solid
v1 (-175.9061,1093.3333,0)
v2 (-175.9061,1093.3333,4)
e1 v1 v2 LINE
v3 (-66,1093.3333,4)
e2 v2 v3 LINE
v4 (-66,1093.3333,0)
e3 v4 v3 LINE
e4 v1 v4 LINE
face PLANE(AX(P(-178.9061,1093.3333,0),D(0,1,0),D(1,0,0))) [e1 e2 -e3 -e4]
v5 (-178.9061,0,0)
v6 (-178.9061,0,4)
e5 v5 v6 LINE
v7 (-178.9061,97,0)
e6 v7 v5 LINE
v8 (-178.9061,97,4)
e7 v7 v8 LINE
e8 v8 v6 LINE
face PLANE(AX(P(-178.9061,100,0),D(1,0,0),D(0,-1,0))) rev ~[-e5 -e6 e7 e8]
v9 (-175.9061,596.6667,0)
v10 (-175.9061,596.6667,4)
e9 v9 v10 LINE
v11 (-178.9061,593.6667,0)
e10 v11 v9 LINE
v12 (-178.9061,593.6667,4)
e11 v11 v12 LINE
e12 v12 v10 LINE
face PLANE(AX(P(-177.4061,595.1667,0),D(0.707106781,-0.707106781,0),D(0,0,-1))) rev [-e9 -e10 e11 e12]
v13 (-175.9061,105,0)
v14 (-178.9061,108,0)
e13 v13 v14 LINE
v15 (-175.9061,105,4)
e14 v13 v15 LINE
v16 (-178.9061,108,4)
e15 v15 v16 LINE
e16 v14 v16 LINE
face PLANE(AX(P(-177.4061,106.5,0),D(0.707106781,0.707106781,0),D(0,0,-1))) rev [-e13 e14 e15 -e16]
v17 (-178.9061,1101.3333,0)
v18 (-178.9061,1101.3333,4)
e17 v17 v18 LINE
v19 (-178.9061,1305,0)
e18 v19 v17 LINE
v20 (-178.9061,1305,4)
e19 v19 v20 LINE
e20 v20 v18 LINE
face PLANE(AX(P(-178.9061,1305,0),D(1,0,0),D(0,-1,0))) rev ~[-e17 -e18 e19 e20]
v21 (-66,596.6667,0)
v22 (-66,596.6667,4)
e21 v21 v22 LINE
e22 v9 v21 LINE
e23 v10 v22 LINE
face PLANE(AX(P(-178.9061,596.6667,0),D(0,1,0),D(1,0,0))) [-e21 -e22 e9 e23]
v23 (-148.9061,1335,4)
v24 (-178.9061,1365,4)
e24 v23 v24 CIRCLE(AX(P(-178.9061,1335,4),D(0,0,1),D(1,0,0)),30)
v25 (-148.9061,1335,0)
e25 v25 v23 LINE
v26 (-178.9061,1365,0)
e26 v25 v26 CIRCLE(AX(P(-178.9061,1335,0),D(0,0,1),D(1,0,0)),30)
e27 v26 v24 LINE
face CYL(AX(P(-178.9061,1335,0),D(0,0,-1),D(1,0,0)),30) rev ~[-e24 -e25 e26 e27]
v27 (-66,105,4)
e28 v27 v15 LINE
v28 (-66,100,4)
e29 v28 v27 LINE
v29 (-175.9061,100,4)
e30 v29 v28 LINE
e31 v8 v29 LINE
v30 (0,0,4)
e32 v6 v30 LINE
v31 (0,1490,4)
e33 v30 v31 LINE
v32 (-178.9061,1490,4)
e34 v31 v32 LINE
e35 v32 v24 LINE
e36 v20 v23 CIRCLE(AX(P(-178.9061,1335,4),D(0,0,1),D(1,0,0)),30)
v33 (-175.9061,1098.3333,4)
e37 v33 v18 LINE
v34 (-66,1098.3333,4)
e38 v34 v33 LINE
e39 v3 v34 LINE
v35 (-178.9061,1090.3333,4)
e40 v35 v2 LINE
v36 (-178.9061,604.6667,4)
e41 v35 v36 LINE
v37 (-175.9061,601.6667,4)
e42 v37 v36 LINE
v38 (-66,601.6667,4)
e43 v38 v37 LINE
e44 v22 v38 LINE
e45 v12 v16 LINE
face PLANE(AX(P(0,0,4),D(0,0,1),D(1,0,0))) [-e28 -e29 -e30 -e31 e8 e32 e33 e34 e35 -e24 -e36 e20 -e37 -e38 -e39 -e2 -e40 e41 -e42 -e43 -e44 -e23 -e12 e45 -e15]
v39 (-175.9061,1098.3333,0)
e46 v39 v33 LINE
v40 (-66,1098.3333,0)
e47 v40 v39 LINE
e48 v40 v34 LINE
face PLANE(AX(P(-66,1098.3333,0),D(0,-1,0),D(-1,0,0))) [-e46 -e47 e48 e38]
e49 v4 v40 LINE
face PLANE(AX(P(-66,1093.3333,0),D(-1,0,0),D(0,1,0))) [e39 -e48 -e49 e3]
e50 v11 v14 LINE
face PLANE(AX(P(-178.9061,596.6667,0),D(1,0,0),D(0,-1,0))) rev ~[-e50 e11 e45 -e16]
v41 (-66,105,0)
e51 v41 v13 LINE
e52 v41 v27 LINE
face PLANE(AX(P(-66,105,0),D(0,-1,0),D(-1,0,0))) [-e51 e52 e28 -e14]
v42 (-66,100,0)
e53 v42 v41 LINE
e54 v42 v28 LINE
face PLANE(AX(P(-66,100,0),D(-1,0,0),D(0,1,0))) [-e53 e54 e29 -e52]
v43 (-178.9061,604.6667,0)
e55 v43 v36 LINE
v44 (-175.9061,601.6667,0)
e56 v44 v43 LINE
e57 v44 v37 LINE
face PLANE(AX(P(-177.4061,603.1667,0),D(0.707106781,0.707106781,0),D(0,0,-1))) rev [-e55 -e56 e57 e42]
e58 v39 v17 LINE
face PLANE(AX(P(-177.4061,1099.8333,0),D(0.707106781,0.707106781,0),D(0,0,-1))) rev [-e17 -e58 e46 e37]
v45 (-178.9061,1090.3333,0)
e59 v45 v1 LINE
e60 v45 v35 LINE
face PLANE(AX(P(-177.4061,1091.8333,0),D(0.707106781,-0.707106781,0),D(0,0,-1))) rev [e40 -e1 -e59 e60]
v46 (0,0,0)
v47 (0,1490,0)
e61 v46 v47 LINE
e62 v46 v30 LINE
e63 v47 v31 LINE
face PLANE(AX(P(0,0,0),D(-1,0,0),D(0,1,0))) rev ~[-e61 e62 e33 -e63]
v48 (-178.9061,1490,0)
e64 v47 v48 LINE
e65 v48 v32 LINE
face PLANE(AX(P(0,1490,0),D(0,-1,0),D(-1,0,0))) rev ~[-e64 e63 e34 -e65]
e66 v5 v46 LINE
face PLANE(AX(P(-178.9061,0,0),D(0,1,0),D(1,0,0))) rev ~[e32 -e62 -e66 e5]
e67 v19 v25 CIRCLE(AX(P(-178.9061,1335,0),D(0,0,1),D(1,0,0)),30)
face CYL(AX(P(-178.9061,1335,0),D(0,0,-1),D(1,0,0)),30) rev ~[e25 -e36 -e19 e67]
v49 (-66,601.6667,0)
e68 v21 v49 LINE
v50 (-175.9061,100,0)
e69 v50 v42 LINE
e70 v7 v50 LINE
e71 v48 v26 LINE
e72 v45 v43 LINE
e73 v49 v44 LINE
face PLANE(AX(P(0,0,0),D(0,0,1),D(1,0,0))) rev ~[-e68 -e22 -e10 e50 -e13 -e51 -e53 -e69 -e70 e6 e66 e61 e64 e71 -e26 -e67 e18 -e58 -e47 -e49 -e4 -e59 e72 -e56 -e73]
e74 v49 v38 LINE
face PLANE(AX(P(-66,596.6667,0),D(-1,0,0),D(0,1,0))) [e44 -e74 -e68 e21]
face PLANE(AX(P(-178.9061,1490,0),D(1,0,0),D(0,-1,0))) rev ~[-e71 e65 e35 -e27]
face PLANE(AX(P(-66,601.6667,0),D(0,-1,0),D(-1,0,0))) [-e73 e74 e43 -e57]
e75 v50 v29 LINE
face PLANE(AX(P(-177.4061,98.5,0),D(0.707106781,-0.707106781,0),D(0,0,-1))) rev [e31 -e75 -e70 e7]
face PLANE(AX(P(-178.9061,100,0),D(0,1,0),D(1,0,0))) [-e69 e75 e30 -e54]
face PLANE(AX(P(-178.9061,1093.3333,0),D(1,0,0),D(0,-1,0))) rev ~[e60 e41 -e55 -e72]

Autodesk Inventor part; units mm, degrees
ref_plane "YZ Plane" through (0, 0, 0) normal (1, 0, 0) x (0, 1, 0)
ref_plane "XZ Plane" through (0, 0, 0) normal (0, 1, 0) x (-1, 0, 0)
ref_plane "XY Plane" through (0, 0, 0) normal (0, 0, 1) x (1, 0, 0)
sketch "Sketch1" plane through (0, 0, 0) normal (0, 0, 1) x (1, 0, 0)
  line L0 (0, 1490) -> (-178.9061, 1490)
  line L1 (-178.9061, 1490) -> (-178.9061, 0)
  line L2 (-178.9061, 0) -> (0, 0)
  line L3 (0, 0) -> (0, 1490)
  line L4 (-178.9061, 100) -> (-66, 100)
  line L5 (-66, 100) -> (-66, 105)
  line L6 (-66, 105) -> (-178.9061, 105)
  line L7 (-178.9061, 105) -> (-178.9061, 100)
  line L8 (-178.9061, 596.6667) -> (-66, 596.6667)
  line L9 (-66, 596.6667) -> (-66, 601.6667)
  line L10 (-66, 601.6667) -> (-178.9061, 601.6667)
  line L11 (-178.9061, 601.6667) -> (-178.9061, 596.6667)
  line L12 (-178.9061, 1093.3333) -> (-66, 1093.3333)
  line L13 (-66, 1093.3333) -> (-66, 1098.3333)
  line L14 (-66, 1098.3333) -> (-178.9061, 1098.3333)
  line L15 (-178.9061, 1098.3333) -> (-178.9061, 1093.3333)
  circle A0 centre (-178.9061, 1335) radius 30
  point P0 (-178.9061, 1098.3333)
  point P1 (-178.9061, 1093.3333)
  point P2 (-178.9061, 596.6667)
  point P3 (-178.9061, 105)
  point P4 (-178.9061, 1365)
  point P5 (-178.9061, 1305)
  dimension "d0" = 1490
  dimension "d1" = 178.9061
  dimension "d2" = 5
  dimension "d4" = 100
  dimension "d7" = 496.6667
  dimension "d23" = 66
  dimension "d29" = 60
  dimension "d30" = 1335
extrude "Plate1" add sketch "Sketch1" along normal blind 4 contours L3 L2 L1 L4 L5 L6 L8 L9 L10 L12 L13 L14 A0 L0
chamfer "Corner Chamfer1" distance 3 angle 45 6 edges at (-178.9061, 100, 2) (-178.9061, 105, 2) (-178.9061, 596.6667, 2) (-178.9061, 601.6667, 2) (-178.9061, 1098.3333, 2) (-178.9061, 1093.3333, 2)
equation "\"d0\" = Стрингер_длина"
equation "\"d1\" = стрингер_глубина_2"
equation "\"d2\" = паз_под_стрингер_толщина"
equation "\"d7\" = Шаг_шпангоутов"
equation "\"d23\" = паз_под_стрингер_глубина - Thickness"
equation "\"d29\" = 2 * радиус_выреза_под_сварку"
equation "\"d12\" = Thickness"
equation "\"BendRadius\" = Thickness"
equation "\"BendReliefWidth\" = Thickness"
equation "\"BendReliefDepth\" = 0.5 * Thickness"
equation "\"CornerReliefSize\" = 4 * Thickness"
equation "\"MinimumRemnant\" = 2 * Thickness"
equation "\"TransitionRadius\" = BendRadius"
equation "\"JacobiRadiusSize\" = BendRadius"
equation "\"GapSize\" = Thickness"
equation "\"Стрингер_длина\" = 1490"
equation "\"стрингер_глубина_2\" = 178.906141"
equation "\"паз_под_стрингер_толщина\" = 5"
equation "\"Шаг_шпангоутов\" = 496.666667"
equation "\"паз_под_стрингер_глубина\" = 70"
equation "\"Thickness\" = 4"
equation "\"радиус_выреза_под_сварку\" = 30"
properties part number "GBK 3103 stringer 2" material "Steel"
